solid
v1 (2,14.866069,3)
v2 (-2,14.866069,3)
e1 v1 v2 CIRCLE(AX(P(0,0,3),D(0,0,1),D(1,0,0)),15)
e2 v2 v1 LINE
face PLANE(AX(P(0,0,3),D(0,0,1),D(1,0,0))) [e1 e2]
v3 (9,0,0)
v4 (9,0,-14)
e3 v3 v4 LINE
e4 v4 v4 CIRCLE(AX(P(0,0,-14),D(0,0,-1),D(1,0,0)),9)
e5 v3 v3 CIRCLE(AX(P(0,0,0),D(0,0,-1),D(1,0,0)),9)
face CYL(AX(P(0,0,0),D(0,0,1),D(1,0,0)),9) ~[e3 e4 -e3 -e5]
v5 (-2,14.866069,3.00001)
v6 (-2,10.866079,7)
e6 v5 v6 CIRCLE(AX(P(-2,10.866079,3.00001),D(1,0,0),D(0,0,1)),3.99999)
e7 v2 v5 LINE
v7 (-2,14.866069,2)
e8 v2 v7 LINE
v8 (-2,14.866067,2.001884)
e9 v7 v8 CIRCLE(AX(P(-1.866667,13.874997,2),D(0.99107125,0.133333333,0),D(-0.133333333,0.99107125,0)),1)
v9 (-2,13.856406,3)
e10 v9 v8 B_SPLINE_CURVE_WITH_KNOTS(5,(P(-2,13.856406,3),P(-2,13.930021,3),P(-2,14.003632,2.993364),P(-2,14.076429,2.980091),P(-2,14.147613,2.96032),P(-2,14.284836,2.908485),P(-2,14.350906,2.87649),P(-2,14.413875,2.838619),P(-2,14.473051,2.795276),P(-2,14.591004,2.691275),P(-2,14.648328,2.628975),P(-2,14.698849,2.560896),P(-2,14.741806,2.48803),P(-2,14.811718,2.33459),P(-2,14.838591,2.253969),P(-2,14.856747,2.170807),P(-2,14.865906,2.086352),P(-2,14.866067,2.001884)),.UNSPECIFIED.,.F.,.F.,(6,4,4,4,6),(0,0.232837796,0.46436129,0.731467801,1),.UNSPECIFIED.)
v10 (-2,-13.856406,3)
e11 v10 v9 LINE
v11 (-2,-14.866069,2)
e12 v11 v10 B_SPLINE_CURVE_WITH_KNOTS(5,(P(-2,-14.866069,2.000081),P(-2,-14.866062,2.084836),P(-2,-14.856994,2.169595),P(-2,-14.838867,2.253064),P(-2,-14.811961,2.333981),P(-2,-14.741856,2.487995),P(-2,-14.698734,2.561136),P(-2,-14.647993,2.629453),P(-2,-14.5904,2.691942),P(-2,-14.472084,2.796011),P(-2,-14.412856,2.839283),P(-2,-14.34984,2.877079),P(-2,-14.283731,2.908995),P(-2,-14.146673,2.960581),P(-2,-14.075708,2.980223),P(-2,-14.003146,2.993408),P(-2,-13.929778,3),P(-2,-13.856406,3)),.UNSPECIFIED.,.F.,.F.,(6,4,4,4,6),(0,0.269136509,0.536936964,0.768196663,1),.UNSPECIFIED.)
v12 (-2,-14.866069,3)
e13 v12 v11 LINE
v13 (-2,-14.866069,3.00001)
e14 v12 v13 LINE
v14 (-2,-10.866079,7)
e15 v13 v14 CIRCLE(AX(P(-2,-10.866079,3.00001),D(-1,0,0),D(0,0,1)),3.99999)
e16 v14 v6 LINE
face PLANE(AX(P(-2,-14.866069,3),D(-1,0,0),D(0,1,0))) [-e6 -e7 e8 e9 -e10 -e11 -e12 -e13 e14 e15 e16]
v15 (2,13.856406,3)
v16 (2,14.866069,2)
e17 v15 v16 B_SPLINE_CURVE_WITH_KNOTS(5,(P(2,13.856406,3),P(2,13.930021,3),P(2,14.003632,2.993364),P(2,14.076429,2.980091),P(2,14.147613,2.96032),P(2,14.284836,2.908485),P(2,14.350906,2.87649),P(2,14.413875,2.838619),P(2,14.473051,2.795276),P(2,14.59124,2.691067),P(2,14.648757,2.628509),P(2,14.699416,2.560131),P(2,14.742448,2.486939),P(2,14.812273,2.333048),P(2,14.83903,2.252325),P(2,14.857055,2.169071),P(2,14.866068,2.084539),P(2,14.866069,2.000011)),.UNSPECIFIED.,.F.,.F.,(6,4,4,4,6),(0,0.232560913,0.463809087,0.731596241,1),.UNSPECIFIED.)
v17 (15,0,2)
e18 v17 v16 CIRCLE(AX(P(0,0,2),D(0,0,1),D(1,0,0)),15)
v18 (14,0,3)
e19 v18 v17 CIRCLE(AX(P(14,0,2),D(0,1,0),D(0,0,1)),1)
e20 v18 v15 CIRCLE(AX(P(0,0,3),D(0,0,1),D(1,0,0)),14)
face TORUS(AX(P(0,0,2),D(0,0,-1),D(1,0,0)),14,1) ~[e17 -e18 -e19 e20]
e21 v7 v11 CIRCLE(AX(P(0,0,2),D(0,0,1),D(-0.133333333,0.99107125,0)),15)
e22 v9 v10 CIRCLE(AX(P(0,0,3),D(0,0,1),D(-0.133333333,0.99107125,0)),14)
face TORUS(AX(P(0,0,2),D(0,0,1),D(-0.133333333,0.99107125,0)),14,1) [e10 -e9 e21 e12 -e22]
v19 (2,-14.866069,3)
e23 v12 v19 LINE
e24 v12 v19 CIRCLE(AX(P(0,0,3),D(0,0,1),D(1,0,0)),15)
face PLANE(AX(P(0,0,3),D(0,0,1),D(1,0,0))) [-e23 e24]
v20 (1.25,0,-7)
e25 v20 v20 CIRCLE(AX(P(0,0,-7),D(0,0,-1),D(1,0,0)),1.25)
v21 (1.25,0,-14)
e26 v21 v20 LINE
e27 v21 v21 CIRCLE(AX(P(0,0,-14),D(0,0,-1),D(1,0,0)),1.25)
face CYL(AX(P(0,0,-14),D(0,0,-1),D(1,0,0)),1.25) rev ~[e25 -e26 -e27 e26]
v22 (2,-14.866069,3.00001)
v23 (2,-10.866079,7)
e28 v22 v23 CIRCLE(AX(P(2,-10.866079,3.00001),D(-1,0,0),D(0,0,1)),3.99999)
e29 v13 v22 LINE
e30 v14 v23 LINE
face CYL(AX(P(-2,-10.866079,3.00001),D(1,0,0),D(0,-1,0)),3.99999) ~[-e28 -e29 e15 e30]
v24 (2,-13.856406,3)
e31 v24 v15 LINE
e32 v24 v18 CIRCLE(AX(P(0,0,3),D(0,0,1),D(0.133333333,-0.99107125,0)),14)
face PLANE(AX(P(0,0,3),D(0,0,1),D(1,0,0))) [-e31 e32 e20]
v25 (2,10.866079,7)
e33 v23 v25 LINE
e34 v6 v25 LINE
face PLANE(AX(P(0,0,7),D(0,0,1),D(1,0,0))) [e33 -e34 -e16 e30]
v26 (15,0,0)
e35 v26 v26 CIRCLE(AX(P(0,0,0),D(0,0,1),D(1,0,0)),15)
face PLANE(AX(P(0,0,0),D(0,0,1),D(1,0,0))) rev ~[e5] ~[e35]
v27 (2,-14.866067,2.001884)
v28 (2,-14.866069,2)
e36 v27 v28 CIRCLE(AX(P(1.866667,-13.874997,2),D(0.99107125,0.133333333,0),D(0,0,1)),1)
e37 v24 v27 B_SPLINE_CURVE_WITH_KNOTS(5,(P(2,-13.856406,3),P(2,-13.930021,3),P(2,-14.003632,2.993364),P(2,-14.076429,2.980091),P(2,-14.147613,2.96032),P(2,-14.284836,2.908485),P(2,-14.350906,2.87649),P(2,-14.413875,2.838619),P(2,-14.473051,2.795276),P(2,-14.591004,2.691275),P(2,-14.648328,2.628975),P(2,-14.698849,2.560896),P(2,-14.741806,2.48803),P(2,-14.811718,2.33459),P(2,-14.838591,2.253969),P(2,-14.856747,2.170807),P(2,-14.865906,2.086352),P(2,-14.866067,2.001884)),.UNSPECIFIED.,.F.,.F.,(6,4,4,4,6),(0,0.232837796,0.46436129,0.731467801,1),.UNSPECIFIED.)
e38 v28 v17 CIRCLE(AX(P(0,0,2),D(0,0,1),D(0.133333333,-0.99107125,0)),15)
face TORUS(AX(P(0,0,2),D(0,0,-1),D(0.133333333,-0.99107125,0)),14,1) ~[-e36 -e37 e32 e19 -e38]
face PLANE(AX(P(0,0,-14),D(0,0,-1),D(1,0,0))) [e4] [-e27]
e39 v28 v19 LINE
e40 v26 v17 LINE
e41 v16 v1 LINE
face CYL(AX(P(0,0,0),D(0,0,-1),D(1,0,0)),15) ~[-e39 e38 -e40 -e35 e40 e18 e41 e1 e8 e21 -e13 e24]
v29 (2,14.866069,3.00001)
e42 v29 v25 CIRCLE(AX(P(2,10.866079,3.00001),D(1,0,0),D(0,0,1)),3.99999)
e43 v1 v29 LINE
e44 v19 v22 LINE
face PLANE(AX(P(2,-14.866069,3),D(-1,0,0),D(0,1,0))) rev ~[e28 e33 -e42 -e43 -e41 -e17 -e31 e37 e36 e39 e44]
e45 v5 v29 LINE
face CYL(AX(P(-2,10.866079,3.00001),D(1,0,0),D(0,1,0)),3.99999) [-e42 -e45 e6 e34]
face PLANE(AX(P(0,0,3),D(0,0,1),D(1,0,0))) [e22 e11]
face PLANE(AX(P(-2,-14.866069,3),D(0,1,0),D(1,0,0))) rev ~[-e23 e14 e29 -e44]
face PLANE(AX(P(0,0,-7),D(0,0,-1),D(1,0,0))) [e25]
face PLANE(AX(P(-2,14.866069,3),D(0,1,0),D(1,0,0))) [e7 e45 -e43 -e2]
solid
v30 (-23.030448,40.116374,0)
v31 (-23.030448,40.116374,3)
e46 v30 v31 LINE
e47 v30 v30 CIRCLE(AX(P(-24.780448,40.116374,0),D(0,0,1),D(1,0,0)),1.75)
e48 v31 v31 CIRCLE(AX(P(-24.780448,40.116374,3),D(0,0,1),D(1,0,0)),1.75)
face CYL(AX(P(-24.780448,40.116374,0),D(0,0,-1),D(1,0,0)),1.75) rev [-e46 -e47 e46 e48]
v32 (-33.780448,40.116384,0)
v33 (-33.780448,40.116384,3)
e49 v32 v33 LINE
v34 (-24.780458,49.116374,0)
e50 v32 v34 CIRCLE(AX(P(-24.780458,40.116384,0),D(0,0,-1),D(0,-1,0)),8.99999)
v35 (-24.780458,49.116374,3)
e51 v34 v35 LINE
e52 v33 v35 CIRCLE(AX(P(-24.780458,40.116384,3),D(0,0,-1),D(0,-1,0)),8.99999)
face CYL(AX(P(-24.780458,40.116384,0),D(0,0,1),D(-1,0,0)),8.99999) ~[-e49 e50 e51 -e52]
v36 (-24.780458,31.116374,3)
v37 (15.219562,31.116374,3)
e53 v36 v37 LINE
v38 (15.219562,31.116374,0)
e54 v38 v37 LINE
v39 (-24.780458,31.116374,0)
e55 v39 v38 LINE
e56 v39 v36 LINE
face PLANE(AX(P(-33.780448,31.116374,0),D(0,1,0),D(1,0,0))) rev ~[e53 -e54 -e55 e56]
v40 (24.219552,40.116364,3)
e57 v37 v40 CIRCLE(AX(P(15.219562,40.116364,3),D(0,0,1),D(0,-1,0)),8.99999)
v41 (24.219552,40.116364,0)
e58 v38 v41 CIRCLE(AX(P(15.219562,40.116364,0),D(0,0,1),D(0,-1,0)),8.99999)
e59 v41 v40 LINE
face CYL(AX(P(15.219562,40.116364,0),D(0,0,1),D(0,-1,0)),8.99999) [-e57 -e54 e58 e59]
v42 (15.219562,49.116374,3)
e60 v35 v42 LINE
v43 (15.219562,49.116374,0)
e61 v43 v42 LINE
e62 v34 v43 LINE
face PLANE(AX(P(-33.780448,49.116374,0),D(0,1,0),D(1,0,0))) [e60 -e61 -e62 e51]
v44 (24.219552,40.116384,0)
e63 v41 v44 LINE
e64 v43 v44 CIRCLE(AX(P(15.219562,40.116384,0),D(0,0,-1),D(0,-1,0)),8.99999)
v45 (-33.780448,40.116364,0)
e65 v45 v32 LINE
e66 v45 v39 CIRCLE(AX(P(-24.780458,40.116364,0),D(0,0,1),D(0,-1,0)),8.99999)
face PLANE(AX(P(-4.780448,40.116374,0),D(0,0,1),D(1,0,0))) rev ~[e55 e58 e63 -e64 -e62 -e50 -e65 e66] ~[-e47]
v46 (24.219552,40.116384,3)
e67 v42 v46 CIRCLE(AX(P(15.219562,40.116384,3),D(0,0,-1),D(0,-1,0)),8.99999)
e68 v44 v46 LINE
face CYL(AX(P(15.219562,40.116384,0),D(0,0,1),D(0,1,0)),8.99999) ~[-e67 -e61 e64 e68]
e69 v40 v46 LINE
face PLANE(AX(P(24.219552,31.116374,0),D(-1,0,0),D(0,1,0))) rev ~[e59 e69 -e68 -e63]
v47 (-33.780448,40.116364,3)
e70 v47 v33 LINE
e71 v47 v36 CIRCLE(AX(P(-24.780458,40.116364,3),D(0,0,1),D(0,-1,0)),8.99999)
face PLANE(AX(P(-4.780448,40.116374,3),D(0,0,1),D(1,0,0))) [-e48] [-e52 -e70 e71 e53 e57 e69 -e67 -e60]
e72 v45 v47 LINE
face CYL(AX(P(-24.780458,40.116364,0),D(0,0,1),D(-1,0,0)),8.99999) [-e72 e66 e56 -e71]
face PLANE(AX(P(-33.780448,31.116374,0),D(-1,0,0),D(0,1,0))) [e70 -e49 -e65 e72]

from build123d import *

# Parameters (mm, degrees)
F0_R         = 15
F1_DEPTH     = 3
F2_R         = 9
F3_DEPTH     = 14
F4_W         = 4
F4_H         = 29.7321374946
F5_DEPTH     = 4
F6_R         = 3.99999
F7_T4_ANGLE  = 164.6754886785
F7_T9_ANGLE  = 82.3377443392
F7_T14_ANGLE = 82.3377443392
F8_R         = 1.25
F9_DEPTH     = 7
F10_W        = 58
F10_H        = 18
F10_R        = 1.75
F11_DEPTH    = 3
F12_R        = 8.99999


# Not quite as in the source:
# - a fillet or chamfer that OpenCascade refuses, or shapes differently, is made with other operations: its cross-section is extruded or revolved along the edge and cut away or added
# - a fillet or chamfer is up to 0.001 mm smaller than in the source, because OpenCascade refuses the exact size


with BuildPart() as f1:
    # F0 (on Top) → F1 (new body)
    with BuildSketch(Plane.XY):
        Circle(F0_R)
    extrude(amount=F1_DEPTH)

    # F2 (on face) → F3 (join)
    with BuildSketch(Plane(origin=(0, 0, 0), x_dir=(1, 0, 0), z_dir=(0, 0, -1))):
        Circle(F2_R)
    extrude(amount=F3_DEPTH)

    # F4 (on face) → F5 (join)
    with BuildSketch(Plane.XY.offset(3)):
        Rectangle(F4_W, F4_H)
    extrude(amount=F5_DEPTH)

    # F6 (radius 4 in the source; OpenCascade refuses exactly that, so slightly less here)
    f6_edges = [f1.edges().sort_by_distance(p)[0] for p in [
        (0, 14.866069, 7),
        (0, -14.866069, 7),
    ]]
    fillet(f6_edges, radius=F6_R)

    # F7: fillet of radius 1 on 3 edges, made by hand


with BuildPart() as f7_tool2:
    # F7_s3 → F7_t4 (revolve)
    with BuildSketch(Plane(origin=(0, 0, 0), x_dir=(0, 0, 1), z_dir=(0.9910712498, 0.1333333333, 0))):
        with BuildLine():
            ThreePointArc((2, -15), (2.7071067812, -14.7071067812), (3, -14))
            Line((3, -14), (3, -15))
            Line((3, -15), (2, -15))
        make_face()
    revolve(axis=Axis((0, 0, 3), (0, 0, 1)), revolution_arc=F7_T4_ANGLE)

    split(bisect_by=Plane.YZ.offset(-2), keep=Keep.BOTTOM)


with BuildPart() as f1_1:
    add(f1.part)

    # F7_t1: cut F7_tool2
    add(f7_tool2.part, mode=Mode.SUBTRACT)


with BuildPart() as f7_tool7:
    # F7_s8 → F7_t9 (revolve)
    with BuildSketch(Plane(origin=(0, 0, 0), x_dir=(0, 0, 1), z_dir=(-0.9910712498, -0.1333333333, 0))):
        with BuildLine():
            ThreePointArc((3, -14), (2.7071067812, -14.7071067812), (2, -15))
            Line((2, -15), (3, -15))
            Line((3, -15), (3, -14))
        make_face()
    revolve(axis=Axis((0, 0, 3), (0, 0, 1)), revolution_arc=F7_T9_ANGLE)

    split(bisect_by=Plane.YZ.offset(2), keep=Keep.TOP)


with BuildPart() as f1_2:
    add(f1_1.part)

    # F7_t6: cut F7_tool7
    add(f7_tool7.part, mode=Mode.SUBTRACT)


with BuildPart() as f7_tool12:
    # F7_s13 → F7_t14 (revolve)
    with BuildSketch(Plane.XZ):
        with BuildLine():
            ThreePointArc((14, 3), (14.7071067812, 2.7071067812), (15, 2))
            Line((15, 2), (15, 3))
            Line((15, 3), (14, 3))
        make_face()
    revolve(axis=Axis((0, 0, 3), (0, 0, 1)), revolution_arc=F7_T14_ANGLE)

    split(bisect_by=Plane.YZ.offset(2), keep=Keep.TOP)


with BuildPart() as f1_3:
    add(f1_2.part)

    # F7_t11: cut F7_tool12
    add(f7_tool12.part, mode=Mode.SUBTRACT)

    # F8 (on face) → F9 (cut)
    with BuildSketch(Plane(origin=(0, 0, -14), x_dir=(1, 0, 0), z_dir=(0, 0, -1))):
        Circle(F8_R)
    extrude(amount=-F9_DEPTH, mode=Mode.SUBTRACT)


with BuildPart() as f11:
    # F10 (on Top) → F11 (new body)
    with BuildSketch(Plane.XY):
        with Locations((-4.7804481387, 40.116373837)):
            Rectangle(F10_W, F10_H)
        with Locations((-24.7804481387, 40.116373837)):
            Circle(F10_R, mode=Mode.SUBTRACT)
    extrude(amount=F11_DEPTH)

    # F12 (radius 9 in the source; OpenCascade refuses exactly that, so slightly less here)
    f12_edges = [f11.edges().sort_by_distance(p)[0] for p in [
        (-33.780448, 49.116374, 1.5),
        (-33.780448, 31.116374, 1.5),
        (24.219552, 49.116374, 1.5),
        (24.219552, 31.116374, 1.5),
    ]]
    fillet(f12_edges, radius=F12_R)


solid = Compound([f1_3.part, f11.part])
